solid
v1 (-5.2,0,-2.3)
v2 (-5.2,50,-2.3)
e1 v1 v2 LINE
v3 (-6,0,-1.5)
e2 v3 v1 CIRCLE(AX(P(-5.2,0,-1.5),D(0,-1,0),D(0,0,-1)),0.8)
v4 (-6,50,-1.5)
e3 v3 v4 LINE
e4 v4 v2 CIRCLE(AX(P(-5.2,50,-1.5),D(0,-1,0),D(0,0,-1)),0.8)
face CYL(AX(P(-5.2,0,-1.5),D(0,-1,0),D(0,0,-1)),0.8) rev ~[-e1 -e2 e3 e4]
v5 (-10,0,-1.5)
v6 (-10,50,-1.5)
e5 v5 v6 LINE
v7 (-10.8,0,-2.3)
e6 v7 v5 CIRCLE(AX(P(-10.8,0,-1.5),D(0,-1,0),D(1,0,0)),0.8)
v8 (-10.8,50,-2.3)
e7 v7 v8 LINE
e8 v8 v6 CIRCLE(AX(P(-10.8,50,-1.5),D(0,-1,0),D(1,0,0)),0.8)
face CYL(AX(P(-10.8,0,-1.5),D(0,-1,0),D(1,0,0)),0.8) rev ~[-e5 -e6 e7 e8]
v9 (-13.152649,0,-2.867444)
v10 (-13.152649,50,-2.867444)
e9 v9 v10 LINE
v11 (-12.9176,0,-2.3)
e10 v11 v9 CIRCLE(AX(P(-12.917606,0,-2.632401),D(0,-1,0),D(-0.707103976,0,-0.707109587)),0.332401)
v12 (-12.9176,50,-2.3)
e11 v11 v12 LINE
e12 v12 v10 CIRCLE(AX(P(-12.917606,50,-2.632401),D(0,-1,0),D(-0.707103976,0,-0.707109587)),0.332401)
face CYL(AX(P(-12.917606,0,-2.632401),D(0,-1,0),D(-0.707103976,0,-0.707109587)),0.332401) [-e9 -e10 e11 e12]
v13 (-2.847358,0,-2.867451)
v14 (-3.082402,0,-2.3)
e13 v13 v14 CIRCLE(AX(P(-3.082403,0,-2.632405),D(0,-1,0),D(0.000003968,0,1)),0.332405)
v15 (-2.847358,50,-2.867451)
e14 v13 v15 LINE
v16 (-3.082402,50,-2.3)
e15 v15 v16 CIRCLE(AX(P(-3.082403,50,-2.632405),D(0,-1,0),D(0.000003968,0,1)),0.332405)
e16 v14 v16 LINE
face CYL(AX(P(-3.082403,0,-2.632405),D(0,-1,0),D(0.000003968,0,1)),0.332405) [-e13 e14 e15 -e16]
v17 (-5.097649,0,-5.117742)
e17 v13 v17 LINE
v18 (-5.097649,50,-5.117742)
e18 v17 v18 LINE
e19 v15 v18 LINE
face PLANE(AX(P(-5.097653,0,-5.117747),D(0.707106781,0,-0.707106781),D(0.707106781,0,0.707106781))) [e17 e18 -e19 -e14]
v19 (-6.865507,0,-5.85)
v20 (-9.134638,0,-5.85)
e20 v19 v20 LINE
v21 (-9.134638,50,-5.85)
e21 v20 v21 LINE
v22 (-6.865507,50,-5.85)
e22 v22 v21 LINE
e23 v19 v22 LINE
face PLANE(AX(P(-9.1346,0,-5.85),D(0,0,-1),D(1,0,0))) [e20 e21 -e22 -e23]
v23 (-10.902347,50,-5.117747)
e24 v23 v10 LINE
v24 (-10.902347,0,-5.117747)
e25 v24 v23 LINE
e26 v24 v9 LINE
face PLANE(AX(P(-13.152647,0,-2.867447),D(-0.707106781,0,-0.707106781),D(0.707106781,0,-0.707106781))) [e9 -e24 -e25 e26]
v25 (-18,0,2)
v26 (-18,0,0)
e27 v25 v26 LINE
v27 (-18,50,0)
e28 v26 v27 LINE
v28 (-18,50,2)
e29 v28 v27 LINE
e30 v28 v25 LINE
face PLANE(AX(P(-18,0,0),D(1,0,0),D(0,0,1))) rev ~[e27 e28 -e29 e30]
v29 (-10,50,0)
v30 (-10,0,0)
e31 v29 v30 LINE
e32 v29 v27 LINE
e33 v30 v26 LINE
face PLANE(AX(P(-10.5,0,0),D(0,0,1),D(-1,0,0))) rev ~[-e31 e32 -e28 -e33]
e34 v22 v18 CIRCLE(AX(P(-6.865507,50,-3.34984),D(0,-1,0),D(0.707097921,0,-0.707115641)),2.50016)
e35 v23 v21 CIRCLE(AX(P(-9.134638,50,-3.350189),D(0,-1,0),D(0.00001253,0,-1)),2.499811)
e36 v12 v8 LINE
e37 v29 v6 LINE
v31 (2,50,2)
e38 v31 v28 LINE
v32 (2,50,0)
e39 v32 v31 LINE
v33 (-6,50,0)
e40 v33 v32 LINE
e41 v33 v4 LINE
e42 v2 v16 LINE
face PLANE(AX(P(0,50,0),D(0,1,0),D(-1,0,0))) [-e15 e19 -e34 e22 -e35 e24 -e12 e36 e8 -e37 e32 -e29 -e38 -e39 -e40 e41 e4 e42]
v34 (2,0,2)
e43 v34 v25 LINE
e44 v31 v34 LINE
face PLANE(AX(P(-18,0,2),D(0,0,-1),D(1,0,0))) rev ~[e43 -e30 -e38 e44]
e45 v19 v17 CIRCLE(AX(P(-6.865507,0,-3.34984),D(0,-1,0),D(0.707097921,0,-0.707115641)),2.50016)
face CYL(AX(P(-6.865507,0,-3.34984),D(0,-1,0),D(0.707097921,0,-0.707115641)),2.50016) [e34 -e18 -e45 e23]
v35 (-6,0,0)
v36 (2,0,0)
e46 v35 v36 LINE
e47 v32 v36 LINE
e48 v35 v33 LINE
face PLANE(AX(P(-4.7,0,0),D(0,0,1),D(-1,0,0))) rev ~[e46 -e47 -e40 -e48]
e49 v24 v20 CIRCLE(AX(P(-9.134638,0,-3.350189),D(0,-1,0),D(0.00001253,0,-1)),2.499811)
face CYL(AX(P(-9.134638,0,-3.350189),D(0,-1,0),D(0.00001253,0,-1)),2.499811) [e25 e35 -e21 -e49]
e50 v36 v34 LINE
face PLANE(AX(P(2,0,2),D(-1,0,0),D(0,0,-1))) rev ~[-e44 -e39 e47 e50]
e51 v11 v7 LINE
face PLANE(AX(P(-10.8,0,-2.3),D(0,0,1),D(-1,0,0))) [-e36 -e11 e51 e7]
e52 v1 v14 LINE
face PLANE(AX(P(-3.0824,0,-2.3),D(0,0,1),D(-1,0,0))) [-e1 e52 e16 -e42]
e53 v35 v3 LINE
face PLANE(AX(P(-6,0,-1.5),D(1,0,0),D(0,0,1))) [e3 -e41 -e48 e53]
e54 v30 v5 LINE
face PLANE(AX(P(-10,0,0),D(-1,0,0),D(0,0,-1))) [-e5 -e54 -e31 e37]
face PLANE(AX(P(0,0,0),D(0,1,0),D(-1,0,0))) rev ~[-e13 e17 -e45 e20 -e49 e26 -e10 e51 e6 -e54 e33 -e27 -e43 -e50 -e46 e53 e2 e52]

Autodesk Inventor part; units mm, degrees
ref_plane "YZ Plane" through (0, 0, 0) normal (1, 0, 0) x (0, 1, 0)
ref_plane "XZ Plane" through (0, 0, 0) normal (0, 1, 0) x (-1, 0, 0)
ref_plane "XY Plane" through (0, 0, 0) normal (0, 0, 1) x (1, 0, 0)
sketch "Szkic1" plane through (0, 0, 0) normal (0, 1, 0) x (-1, 0, 0)
  arc A0 (11.3, 0) -> (10.5, -0.8) centre (11.3, -0.8) ccw
  line L0 (10.5, -0.8) -> (10.5, -1.5)
  arc A1 (10.5, -1.5) -> (10.8, -1.8) centre (10.8, -1.5) ccw
  line L1 (10.8, -1.8) -> (12.9176, -1.8)
  arc A2 (13.5062, -3.221) -> (12.9176, -1.8) centre (12.9176, -2.6324) ccw
  line L2 (13.5062, -3.221) -> (11.2559, -5.4713)
  arc A3 (9.1346, -6.35) -> (11.2559, -5.4713) centre (9.1346, -3.35) ccw
  line L3 (9.1346, -6.35) -> (6.8654, -6.35)
  arc A4 (4.7441, -5.4713) -> (6.8654, -6.35) centre (6.8654, -3.35) ccw
  line L4 (4.7441, -5.4713) -> (2.4938, -3.221)
  arc A5 (3.0824, -1.8) -> (2.4938, -3.221) centre (3.0824, -2.6324) ccw
  line L5 (3.0824, -1.8) -> (5.2, -1.8)
  arc A6 (5.2, -1.8) -> (5.5, -1.5) centre (5.2, -1.5) ccw
  line L6 (5.5, -1.5) -> (5.5, -0.8)
  arc A7 (5.5, -0.8) -> (4.7, 0) centre (4.7, -0.8) ccw
  line L7 (0, 0) -> (4.7, 0)
  arc A8 (0, 0) -> (-2, -2) centre (0, -2) ccw
  line L8 (-2, -6.7) -> (-2, -2)
  arc A9 (-2, -6.7) -> (-1.2, -7.5) centre (-1.2, -6.7) ccw
  line L9 (-1.2, -7.5) -> (-0.5, -7.5)
  arc A10 (-0.5, -7.5) -> (-0.2, -7.2) centre (-0.5, -7.2) ccw
  line L10 (-0.2, -7.2) -> (-0.2, -5.0824)
  arc A11 (1.221, -4.4938) -> (-0.2, -5.0824) centre (0.6324, -5.0824) ccw
  line L11 (1.221, -4.4938) -> (3.4713, -6.7441)
  arc A12 (4.35, -8.8654) -> (3.4713, -6.7441) centre (1.35, -8.8654) ccw
  line L12 (4.35, -8.8654) -> (4.35, -11.1346)
  arc A13 (3.4713, -13.2559) -> (4.35, -11.1346) centre (1.35, -11.1346) ccw
  line L13 (3.4713, -13.2559) -> (1.221, -15.5062)
  arc A14 (-0.2, -14.9176) -> (1.221, -15.5062) centre (0.6324, -14.9176) ccw
  line L14 (-0.2, -14.9176) -> (-0.2, -12.8)
  arc A15 (-0.2, -12.8) -> (-0.5, -12.5) centre (-0.5, -12.8) ccw
  line L15 (-0.5, -12.5) -> (-1.2, -12.5)
  arc A16 (-1.2, -12.5) -> (-2, -13.3) centre (-1.2, -13.3) ccw
  line L16 (-2, -18) -> (-2, -13.3)
  arc A17 (-2, -18) -> (0, -20) centre (0, -18) ccw
  line L17 (4.7, -20) -> (0, -20)
  arc A18 (4.7, -20) -> (5.5, -19.2) centre (4.7, -19.2) ccw
  line L18 (5.5, -19.2) -> (5.5, -18.5)
  arc A19 (5.5, -18.5) -> (5.2, -18.2) centre (5.2, -18.5) ccw
  line L19 (5.2, -18.2) -> (3.0824, -18.2)
  arc A20 (2.4938, -16.779) -> (3.0824, -18.2) centre (3.0824, -17.3676) ccw
  line L20 (2.4938, -16.779) -> (4.7441, -14.5287)
  arc A21 (6.8654, -13.65) -> (4.7441, -14.5287) centre (6.8654, -16.65) ccw
  line L21 (6.8654, -13.65) -> (9.1346, -13.65)
  arc A22 (11.2559, -14.5287) -> (9.1346, -13.65) centre (9.1346, -16.65) ccw
  line L22 (11.2559, -14.5287) -> (13.5062, -16.779)
  arc A23 (12.9176, -18.2) -> (13.5062, -16.779) centre (12.9176, -17.3676) ccw
  line L23 (12.9176, -18.2) -> (10.8, -18.2)
  arc A24 (10.8, -18.2) -> (10.5, -18.5) centre (10.8, -18.5) ccw
  line L24 (10.5, -18.5) -> (10.5, -19.2)
  arc A25 (10.5, -19.2) -> (11.3, -20) centre (11.3, -19.2) ccw
  line L25 (16, -20) -> (11.3, -20)
  arc A26 (16, -20) -> (18, -18) centre (16, -18) ccw
  line L26 (18, -13.3) -> (18, -18)
  arc A27 (18, -13.3) -> (17.2, -12.5) centre (17.2, -13.3) ccw
  line L27 (17.2, -12.5) -> (16.5, -12.5)
  arc A28 (16.5, -12.5) -> (16.2, -12.8) centre (16.5, -12.8) ccw
  line L28 (16.2, -12.8) -> (16.2, -14.9176)
  arc A29 (14.779, -15.5062) -> (16.2, -14.9176) centre (15.3676, -14.9176) ccw
  line L29 (14.779, -15.5062) -> (12.5287, -13.2559)
  arc A30 (11.65, -11.1346) -> (12.5287, -13.2559) centre (14.65, -11.1346) ccw
  line L30 (11.65, -11.1346) -> (11.65, -8.8654)
  arc A31 (12.5287, -6.7441) -> (11.65, -8.8654) centre (14.65, -8.8654) ccw
  line L31 (12.5287, -6.7441) -> (14.779, -4.4938)
  arc A32 (16.2, -5.0824) -> (14.779, -4.4938) centre (15.3676, -5.0824) ccw
  line L32 (16.2, -5.0824) -> (16.2, -7.2)
  arc A33 (16.2, -7.2) -> (16.5, -7.5) centre (16.5, -7.2) ccw
  line L33 (16.5, -7.5) -> (17.2, -7.5)
  arc A34 (17.2, -7.5) -> (18, -6.7) centre (17.2, -6.7) ccw
  line L34 (18, -2) -> (18, -6.7)
  arc A35 (18, -2) -> (16, 0) centre (16, -2) ccw
  line L35 (11.3, 0) -> (16, 0)
  circle A36 centre (8, -10) radius 2.15
  line L36 (18, 2) -> (-2, 2)
  line L37 (-2, 2) -> (-2, 0)
  line L38 (-2, 0) -> (18, 0)
  line L39 (18, 0) -> (18, 2)
  line L40 (10.5, -1.8) -> (5.5, -1.8)
  line L41 (5.5, -1.8) -> (5.5, 0)
  line L42 (5.5, 0) -> (10.5, 0)
  line L43 (10.5, 0) -> (10.5, -1.8)
  point P0 (0, 0)
  point P1 (16, 0)
  point P2 (4.7, 0)
  dimension "d0" = 2
extrude "Wyciągnięcie proste1" add sketch "Szkic1" along normal blind 50 contours L38 L7 L37 L36 L39 L35 | L0 L43 L40 L41 L6 L38 | A1 L1 A2 L2 A3 L3 A4 L4 A5 L5 A6 L41 L40 L43
thicken "Pogrubienie1" operation add thickness 0.5 both sides no extend neighbours yes toward (-1, 0, 0) faces at (-5.5, 16.6667, -1.0333) (-5.4479, 33.3333, -1.669) (-4.4941, 16.6667, -1.8) (-2.4938, 33.3333, -2.0438) (-3.2439, 16.6667, -3.9711) (-5.5386, 33.3333, -6.0406) (-7.6218, 16.6667, -6.35) (-10.6346, 33.3333, -5.9481) (-12.006, 16.6667, -4.7212) (-13.1748, 33.3333, -1.8407) (-12.2117, 16.6667, -1.8) (-10.5402, 33.3333, -1.65) (-10.5, 16.6667, -1.2667)
properties part number "ZItemSpacer"
